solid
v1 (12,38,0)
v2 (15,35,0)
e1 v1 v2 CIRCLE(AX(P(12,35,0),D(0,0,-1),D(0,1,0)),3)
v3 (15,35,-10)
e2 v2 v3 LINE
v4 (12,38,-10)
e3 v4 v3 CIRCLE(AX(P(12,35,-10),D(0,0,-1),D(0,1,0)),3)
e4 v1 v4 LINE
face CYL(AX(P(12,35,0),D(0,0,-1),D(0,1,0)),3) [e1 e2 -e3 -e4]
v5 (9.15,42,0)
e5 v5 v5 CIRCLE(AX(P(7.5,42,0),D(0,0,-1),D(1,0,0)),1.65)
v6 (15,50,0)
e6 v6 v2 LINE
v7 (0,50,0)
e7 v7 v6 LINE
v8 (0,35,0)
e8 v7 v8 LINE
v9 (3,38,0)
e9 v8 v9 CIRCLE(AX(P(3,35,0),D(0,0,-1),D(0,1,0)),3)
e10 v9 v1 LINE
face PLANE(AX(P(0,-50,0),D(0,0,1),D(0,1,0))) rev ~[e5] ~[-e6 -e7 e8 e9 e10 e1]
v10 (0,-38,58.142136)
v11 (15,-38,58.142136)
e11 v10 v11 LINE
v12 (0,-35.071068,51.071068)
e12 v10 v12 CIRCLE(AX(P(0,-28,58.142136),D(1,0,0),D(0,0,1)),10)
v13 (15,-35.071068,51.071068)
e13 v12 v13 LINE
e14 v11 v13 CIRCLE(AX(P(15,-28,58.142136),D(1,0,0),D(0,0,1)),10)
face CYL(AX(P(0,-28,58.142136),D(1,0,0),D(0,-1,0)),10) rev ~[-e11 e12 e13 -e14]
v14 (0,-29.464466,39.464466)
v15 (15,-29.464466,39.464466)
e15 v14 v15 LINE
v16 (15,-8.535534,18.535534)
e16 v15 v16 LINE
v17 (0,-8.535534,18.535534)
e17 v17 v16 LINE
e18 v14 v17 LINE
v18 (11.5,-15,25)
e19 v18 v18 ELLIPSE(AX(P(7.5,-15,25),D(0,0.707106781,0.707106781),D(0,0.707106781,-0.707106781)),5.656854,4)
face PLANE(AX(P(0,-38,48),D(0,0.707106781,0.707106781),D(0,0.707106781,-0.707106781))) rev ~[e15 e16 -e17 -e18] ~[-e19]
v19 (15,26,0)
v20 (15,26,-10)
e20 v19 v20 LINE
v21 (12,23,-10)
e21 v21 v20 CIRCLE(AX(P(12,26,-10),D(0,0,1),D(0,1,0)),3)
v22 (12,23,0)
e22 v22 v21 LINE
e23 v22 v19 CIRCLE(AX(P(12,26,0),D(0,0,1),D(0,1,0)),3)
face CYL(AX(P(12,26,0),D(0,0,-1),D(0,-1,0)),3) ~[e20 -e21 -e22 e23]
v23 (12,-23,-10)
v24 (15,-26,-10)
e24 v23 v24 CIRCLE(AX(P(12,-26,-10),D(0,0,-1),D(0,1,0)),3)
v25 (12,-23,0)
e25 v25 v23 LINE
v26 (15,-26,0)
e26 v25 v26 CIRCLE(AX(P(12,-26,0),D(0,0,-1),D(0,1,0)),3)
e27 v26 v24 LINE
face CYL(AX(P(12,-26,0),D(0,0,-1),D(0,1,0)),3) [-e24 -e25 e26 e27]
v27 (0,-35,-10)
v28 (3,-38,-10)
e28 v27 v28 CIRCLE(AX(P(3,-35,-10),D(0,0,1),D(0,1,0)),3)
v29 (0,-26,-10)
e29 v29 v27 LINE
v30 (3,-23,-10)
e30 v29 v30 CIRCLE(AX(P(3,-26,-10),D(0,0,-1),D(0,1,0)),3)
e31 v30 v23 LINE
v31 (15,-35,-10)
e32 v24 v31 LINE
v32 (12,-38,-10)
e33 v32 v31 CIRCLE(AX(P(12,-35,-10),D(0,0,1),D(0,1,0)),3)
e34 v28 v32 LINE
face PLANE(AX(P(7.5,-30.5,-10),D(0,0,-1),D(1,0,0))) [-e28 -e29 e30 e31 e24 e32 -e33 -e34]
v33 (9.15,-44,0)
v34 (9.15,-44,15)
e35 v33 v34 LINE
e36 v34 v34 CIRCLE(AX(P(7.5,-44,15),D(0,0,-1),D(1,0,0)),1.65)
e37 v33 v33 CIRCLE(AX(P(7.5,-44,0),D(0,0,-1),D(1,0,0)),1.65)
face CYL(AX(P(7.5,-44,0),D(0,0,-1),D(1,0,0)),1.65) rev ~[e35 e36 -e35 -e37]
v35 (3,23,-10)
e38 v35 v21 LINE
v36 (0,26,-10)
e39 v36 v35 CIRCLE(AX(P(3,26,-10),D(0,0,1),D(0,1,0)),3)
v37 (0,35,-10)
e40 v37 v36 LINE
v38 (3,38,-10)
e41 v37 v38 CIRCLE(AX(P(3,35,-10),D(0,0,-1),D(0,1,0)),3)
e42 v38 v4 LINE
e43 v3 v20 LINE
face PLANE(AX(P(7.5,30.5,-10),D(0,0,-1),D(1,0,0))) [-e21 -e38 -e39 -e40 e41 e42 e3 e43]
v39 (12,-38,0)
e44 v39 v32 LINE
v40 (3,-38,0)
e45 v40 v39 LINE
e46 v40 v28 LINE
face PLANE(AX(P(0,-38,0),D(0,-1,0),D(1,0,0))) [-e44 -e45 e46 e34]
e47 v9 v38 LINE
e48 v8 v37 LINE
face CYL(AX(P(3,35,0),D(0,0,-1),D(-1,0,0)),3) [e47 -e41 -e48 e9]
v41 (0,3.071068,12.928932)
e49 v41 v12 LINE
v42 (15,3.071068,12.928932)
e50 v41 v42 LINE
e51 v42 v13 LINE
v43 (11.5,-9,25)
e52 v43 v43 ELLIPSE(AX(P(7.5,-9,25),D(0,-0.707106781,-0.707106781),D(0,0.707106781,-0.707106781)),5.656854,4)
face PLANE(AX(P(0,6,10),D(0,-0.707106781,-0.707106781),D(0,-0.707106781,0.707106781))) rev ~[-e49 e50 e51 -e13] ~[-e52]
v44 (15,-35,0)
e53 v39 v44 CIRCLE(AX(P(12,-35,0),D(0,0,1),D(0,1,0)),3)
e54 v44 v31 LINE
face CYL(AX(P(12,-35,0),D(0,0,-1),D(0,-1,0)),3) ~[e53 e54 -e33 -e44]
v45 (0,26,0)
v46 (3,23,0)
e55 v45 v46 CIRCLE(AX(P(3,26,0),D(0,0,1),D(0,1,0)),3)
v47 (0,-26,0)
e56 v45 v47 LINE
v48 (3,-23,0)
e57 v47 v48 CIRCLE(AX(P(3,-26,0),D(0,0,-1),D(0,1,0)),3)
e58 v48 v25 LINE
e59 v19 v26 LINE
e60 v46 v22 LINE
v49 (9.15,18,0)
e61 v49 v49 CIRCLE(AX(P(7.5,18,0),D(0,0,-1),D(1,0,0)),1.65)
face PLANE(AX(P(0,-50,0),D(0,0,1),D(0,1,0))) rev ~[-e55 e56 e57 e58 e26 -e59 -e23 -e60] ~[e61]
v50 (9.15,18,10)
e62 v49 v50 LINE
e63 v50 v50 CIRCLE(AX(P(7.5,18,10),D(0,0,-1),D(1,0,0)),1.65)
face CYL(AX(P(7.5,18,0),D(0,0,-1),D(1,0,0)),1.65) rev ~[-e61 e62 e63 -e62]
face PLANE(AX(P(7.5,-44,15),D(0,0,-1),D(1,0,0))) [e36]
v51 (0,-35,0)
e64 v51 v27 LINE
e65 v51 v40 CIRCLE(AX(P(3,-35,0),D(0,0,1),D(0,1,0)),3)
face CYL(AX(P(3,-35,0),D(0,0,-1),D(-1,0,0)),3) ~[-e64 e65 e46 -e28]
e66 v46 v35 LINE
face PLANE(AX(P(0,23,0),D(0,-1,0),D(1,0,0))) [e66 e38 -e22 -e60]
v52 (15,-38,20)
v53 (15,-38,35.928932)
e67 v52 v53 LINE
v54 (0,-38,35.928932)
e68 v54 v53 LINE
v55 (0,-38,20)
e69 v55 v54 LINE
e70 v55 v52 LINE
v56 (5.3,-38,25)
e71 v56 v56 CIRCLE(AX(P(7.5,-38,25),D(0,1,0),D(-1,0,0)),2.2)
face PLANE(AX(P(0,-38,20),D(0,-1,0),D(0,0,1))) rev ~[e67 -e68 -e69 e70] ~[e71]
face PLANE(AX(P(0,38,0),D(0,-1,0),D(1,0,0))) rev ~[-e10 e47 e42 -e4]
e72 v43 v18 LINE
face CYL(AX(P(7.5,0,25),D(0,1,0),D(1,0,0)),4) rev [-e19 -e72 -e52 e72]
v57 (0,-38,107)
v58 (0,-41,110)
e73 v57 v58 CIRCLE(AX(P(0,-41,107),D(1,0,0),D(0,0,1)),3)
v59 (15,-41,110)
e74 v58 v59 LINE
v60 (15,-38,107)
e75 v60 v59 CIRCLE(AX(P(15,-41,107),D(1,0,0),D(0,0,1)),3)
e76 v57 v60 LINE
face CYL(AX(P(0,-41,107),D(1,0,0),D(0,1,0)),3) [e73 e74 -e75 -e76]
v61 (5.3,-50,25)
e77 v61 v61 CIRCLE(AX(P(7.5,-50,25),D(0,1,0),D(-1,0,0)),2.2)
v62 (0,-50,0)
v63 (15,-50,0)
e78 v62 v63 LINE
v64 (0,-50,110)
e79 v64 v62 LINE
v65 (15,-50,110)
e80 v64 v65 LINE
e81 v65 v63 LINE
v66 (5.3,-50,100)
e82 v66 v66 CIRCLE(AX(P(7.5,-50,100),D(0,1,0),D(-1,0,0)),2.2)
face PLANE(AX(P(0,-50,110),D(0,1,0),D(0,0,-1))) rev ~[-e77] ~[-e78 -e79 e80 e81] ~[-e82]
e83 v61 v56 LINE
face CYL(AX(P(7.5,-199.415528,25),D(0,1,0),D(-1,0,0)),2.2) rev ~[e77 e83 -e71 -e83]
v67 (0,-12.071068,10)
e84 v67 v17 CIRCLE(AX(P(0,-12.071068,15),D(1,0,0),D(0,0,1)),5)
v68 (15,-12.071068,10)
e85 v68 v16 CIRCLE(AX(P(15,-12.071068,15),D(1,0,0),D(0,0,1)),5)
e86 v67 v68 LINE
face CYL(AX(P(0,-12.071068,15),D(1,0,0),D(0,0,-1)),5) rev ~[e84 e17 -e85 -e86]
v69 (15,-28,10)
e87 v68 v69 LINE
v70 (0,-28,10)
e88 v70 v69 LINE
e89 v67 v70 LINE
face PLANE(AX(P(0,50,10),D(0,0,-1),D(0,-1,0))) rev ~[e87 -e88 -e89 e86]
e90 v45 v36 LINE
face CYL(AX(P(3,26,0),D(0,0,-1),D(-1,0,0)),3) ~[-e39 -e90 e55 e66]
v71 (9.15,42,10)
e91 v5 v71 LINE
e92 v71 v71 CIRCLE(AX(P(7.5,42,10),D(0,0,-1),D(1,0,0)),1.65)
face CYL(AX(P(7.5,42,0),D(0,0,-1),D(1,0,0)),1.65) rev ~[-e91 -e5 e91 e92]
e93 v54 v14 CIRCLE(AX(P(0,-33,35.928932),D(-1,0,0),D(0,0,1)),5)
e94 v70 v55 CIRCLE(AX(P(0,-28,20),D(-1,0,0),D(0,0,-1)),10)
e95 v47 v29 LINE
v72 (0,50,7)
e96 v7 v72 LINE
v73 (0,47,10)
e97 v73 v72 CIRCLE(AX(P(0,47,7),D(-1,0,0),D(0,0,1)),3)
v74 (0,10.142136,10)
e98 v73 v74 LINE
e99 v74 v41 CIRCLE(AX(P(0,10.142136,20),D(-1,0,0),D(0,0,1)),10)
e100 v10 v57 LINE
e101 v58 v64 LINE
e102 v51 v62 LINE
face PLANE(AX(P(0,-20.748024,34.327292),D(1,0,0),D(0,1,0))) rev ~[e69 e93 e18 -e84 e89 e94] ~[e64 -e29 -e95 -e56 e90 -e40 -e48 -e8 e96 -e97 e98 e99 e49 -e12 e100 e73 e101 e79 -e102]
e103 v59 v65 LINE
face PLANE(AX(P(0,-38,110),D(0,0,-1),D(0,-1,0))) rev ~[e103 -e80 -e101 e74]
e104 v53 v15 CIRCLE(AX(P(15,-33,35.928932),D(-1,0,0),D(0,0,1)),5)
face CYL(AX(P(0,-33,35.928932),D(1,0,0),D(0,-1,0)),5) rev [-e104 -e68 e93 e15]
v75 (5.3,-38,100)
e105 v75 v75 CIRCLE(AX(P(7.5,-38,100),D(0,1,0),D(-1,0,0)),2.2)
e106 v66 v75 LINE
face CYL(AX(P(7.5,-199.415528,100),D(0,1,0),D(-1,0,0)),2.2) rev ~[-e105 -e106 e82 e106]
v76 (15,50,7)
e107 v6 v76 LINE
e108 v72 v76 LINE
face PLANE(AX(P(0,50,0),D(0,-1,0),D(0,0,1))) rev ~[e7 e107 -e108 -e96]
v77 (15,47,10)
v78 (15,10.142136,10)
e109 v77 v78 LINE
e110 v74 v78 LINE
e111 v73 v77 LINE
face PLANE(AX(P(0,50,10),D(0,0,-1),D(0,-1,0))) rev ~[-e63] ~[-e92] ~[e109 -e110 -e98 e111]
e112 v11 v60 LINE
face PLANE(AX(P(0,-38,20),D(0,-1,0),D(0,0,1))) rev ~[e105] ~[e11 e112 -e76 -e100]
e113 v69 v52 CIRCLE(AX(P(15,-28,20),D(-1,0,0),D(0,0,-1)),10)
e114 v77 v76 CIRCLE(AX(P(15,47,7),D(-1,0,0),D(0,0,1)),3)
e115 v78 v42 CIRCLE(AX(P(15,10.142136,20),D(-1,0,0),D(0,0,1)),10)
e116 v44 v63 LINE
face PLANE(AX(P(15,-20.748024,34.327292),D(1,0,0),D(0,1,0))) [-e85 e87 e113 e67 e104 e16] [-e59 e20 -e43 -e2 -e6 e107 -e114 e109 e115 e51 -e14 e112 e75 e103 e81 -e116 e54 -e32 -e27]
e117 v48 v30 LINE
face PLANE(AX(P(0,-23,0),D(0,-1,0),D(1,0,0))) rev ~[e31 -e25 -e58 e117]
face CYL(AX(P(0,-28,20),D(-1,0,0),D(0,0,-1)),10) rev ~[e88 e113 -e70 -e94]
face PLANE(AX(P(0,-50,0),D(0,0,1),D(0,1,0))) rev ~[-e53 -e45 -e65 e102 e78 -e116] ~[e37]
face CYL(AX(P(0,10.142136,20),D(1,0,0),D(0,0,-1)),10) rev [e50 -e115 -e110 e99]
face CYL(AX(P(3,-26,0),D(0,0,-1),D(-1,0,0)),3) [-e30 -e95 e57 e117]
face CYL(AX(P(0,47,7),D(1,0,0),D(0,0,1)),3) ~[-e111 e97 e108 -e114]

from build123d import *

# Parameters (mm, degrees)
F1_DEPTH  = 15
F2_DEPTH  = 15
F3_R      = 10
F4_R      = 5
F5_R      = 3
F7_D      = 4.4
F8_R      = 4
F9_DEPTH  = 23.5
F10_W     = 15
F10_H     = 15
F11_DEPTH = 10
F12_DEPTH = 10
F10_R     = 1.65
F13_DEPTH = 15
F14_R     = 3


with BuildPart() as f1:
    # F0 (on Right) → F1 (new body)
    with BuildSketch(Plane.YZ):
        with BuildLine():
            Line((-50, 0), (0, 0))
            Line((0, 0), (50, 0))
            Line((50, 0), (50, 10))
            Line((50, 10), (6, 10))
            Line((6, 10), (0, 10))
            Line((0, 10), (-28, 10))
            ThreePointArc((-28, 10), (-35.0710678119, 12.9289321881), (-38, 20))
            Line((-38, 20), (-38, 48))
            Line((-38, 48), (-38, 54))
            Line((-38, 54), (-38, 110))
            Line((-38, 110), (-50, 110))
            Line((-50, 110), (-50, 10))
            Line((-50, 10), (-50, 0))
        make_face()
    extrude(amount=F1_DEPTH)

    # F0 (on Right) → F2 (join, through all)
    with BuildSketch(Plane.YZ):
        Polygon((0, 10), (6, 10), (-38, 54), (-38, 48), align=None)
    extrude(amount=F2_DEPTH)

    # F3
    f3_edges = [f1.edges().sort_by_distance(p)[0] for p in [
        (7.5, 6, 10),
        (7.5, -38, 54),
    ]]
    fillet(f3_edges, radius=F3_R)

    # F4
    f4_edges = [f1.edges().sort_by_distance(p)[0] for p in [
        (7.5, 0, 10),
        (7.5, -38, 48),
    ]]
    fillet(f4_edges, radius=F4_R)

    # F5
    f5_edges = [f1.edges().sort_by_distance(p)[0] for p in [
        (7.5, 50, 10),
        (7.5, -38, 110),
    ]]
    fillet(f5_edges, radius=F5_R)

    # F7 (through all)
    with Locations(Plane.XZ.offset(50)):
        with Locations((7.5, 100), (7.5, 25)):
            Hole(F7_D / 2)

    # F8 (on Front) → F9 (cut)
    with BuildSketch(Plane.XZ):
        with Locations((7.5, 25)):
            Circle(F8_R)
    extrude(amount=F9_DEPTH, mode=Mode.SUBTRACT)

    # F10 (on face) → F11 (join)
    with BuildSketch(Plane(origin=(0, 0, 0), x_dir=(1, 0, 0), z_dir=(0, 0, -1))):
        with Locations((7.5, 30.5)):
            Rectangle(F10_W, F10_H)
    extrude(amount=F11_DEPTH)

    # F10 (on face) → F12 (join)
    with BuildSketch(Plane(origin=(0, 0, 0), x_dir=(1, 0, 0), z_dir=(0, 0, -1))):
        with Locations((7.5, -30.5)):
            Rectangle(F10_W, F10_H)
    extrude(amount=F12_DEPTH)

    # F10 (on face) → F13 (cut)
    with BuildSketch(Plane(origin=(0, 0, 0), x_dir=(1, 0, 0), z_dir=(0, 0, -1))):
        with Locations((7.5, -42)):
            Circle(F10_R)
        with Locations((7.5, -18)):
            Circle(F10_R)
        with Locations((7.5, 44)):
            Circle(F10_R)
    extrude(amount=-F13_DEPTH, mode=Mode.SUBTRACT)

    # F14
    f14_edges = [f1.edges().sort_by_distance(p)[0] for p in [
        (15, -38, -5),
        (0, -38, -5),
        (0, -23, -5),
        (15, 23, -5),
        (15, 38, -5),
        (0, 38, -5),
        (0, 23, -5),
        (15, -23, -5),
    ]]
    fillet(f14_edges, radius=F14_R)


solid = f1.part
